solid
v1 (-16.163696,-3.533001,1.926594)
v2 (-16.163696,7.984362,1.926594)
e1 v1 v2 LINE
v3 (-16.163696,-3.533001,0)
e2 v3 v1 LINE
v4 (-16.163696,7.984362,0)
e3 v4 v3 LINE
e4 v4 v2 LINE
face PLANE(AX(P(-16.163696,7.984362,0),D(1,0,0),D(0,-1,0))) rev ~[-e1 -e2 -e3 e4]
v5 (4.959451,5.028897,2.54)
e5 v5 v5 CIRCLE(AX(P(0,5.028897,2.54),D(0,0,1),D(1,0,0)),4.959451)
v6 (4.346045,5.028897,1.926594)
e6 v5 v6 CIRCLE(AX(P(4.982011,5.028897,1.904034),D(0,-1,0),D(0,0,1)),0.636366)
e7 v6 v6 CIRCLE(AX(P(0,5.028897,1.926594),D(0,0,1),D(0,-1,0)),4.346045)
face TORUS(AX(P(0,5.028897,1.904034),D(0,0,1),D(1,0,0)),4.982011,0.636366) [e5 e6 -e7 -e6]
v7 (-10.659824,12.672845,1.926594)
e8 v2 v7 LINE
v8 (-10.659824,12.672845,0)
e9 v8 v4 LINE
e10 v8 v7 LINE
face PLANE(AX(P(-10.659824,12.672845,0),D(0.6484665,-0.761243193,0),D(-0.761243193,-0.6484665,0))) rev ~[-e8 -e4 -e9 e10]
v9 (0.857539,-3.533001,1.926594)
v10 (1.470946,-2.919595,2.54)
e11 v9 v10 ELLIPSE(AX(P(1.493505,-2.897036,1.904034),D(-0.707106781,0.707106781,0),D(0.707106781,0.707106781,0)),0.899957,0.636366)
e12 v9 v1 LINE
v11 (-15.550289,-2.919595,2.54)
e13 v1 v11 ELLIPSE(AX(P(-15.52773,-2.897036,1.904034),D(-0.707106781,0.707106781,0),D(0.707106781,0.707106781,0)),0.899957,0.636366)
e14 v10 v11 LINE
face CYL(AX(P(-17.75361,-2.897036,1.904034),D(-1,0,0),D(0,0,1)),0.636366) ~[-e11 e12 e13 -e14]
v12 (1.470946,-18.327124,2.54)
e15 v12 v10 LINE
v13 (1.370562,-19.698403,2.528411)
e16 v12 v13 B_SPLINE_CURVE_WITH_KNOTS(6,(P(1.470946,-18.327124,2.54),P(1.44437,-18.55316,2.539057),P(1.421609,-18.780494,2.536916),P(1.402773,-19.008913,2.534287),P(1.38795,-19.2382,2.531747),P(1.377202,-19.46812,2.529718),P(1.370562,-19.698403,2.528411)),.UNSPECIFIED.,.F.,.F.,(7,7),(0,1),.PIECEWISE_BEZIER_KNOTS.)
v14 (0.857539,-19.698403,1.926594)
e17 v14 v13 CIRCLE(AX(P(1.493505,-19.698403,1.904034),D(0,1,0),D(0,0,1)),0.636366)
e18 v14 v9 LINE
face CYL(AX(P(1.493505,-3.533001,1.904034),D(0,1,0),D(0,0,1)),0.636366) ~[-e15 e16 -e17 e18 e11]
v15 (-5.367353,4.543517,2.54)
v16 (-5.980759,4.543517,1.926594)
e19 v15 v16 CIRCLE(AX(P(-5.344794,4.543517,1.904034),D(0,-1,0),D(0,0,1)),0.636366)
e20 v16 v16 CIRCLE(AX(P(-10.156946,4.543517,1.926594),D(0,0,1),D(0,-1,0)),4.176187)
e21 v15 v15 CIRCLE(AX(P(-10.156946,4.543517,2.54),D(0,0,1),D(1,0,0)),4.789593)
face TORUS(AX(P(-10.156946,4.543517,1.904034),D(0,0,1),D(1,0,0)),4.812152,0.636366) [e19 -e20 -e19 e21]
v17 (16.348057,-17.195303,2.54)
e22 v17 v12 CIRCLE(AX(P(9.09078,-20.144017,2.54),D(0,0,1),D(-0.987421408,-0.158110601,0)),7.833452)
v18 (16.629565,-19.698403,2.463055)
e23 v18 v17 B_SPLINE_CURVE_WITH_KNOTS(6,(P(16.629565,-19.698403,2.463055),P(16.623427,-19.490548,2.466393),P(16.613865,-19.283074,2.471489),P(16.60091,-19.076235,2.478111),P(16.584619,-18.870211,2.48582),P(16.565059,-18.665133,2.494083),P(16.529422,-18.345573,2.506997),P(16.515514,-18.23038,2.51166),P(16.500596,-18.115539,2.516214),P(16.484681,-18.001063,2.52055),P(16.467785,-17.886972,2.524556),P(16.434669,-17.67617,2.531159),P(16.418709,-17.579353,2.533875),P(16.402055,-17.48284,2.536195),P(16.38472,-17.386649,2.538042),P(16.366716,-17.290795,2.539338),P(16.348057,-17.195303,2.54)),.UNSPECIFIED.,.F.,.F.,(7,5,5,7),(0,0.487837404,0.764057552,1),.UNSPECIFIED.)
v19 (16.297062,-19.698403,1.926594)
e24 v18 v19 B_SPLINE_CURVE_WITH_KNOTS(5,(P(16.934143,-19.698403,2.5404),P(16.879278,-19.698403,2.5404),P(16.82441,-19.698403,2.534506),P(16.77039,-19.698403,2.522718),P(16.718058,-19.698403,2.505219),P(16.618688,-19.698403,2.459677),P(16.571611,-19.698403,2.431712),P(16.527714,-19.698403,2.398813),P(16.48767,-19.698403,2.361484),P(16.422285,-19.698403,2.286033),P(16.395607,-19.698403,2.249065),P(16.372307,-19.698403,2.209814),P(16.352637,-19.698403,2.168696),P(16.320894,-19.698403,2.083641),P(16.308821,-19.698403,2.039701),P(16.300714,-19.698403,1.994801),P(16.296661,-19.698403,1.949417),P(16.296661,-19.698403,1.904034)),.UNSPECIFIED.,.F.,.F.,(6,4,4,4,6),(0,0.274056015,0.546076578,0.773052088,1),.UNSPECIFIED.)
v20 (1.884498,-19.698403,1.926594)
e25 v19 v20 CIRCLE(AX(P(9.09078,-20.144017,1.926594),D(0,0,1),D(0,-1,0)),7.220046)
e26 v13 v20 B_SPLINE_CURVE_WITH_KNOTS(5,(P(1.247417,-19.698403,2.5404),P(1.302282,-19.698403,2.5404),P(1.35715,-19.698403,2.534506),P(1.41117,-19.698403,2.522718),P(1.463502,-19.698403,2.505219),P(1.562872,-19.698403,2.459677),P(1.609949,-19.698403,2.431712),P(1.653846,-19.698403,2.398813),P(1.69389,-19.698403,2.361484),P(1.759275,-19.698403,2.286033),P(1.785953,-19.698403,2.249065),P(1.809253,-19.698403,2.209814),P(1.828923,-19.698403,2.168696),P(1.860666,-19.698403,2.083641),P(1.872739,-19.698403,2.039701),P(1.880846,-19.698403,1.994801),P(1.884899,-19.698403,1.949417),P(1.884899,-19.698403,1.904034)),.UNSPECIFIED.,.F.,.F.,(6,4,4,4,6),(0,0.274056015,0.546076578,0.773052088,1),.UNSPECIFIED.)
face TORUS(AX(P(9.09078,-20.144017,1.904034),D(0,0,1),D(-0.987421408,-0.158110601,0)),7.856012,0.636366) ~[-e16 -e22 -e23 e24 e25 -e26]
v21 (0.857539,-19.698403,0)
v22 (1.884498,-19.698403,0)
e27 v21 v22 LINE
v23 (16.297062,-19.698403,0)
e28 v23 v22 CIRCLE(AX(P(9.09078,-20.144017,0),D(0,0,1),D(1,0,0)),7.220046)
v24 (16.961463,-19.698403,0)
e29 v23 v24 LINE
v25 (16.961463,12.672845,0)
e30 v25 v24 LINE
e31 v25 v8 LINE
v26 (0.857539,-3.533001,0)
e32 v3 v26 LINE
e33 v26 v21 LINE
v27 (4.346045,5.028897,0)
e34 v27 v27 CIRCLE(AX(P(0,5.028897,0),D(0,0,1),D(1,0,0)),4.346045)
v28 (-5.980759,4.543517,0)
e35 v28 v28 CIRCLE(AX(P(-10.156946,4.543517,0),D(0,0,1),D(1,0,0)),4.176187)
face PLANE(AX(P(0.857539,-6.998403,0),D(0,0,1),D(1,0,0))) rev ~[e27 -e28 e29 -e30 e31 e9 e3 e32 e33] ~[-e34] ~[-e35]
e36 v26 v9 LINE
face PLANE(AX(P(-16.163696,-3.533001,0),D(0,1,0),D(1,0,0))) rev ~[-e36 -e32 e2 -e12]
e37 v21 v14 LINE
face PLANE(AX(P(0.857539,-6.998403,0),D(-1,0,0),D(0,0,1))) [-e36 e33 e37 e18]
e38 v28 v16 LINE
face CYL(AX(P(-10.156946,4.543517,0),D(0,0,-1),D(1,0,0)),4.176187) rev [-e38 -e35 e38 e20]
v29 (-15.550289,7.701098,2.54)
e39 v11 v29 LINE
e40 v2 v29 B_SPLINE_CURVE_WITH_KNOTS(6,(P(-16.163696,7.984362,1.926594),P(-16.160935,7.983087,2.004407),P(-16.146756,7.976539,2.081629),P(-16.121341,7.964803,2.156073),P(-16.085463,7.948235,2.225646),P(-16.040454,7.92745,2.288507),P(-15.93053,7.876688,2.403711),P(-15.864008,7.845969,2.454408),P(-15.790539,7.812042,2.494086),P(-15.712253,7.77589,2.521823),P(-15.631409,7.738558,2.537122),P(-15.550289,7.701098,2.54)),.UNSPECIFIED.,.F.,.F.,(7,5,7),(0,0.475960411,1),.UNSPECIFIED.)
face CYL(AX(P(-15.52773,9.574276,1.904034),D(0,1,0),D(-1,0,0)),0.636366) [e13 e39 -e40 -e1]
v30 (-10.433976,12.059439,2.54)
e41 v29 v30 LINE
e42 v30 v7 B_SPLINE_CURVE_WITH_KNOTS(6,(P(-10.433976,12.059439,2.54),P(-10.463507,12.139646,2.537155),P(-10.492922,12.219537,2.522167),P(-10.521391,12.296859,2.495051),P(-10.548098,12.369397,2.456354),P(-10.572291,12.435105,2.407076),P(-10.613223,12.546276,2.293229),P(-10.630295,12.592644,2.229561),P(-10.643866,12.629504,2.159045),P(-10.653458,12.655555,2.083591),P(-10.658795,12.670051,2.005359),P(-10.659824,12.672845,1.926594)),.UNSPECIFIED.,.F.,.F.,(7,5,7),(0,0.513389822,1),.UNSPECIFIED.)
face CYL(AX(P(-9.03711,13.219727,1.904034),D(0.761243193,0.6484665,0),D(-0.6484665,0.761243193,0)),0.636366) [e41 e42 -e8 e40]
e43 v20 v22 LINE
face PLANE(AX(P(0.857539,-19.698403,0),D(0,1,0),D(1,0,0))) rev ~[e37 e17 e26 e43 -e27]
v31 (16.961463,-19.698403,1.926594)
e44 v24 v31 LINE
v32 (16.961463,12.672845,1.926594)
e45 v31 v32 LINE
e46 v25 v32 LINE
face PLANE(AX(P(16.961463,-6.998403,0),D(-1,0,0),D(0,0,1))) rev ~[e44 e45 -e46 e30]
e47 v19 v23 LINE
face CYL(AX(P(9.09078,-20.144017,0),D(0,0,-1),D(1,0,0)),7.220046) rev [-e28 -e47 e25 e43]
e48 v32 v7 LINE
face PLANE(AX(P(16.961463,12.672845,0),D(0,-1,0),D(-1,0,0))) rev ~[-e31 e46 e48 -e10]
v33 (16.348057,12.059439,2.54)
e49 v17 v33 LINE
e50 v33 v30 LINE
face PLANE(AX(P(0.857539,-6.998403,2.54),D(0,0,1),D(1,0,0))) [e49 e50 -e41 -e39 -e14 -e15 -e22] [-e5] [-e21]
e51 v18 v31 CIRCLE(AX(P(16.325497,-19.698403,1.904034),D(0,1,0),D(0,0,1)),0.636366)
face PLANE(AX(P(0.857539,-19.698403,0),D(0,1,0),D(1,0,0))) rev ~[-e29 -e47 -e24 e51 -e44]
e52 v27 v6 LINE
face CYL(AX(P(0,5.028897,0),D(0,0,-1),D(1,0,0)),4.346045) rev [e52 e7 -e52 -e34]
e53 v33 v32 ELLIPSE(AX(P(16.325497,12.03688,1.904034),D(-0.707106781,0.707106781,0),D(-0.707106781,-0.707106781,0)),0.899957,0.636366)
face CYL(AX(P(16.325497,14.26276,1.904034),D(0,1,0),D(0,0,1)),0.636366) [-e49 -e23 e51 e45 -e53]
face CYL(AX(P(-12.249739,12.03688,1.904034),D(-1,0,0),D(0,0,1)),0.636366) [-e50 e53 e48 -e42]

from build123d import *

# Parameters (mm, degrees)
F0_R         = 4.1761867796
F0_R_2       = 4.3460448691
F1_DEPTH     = 2.54
F2_DEPTH     = 12.7
F3_R         = 7.2200461369
F4_DEPTH     = 12.7
F7_T1_DEPTH  = 14.697191958
F7_T3_DEPTH  = 10.4099383433
F7_T5_DEPTH  = 30.8011159773
F7_T7_DEPTH  = 35.5510768625
F7_T9_DEPTH  = 17.7553157696
F7_T11_DEPTH = 18.6111496066
F7_T14_ANGLE = 198.1944914786
F7_T23_DEPTH = 17.7553157696
F7_T27_DEPTH = 18.6111496066


# Not quite as in the source:
# - a fillet or chamfer that OpenCascade refuses, or shapes differently, is made with other operations: its cross-section is extruded or revolved along the edge and cut away or added


with BuildPart() as f1:
    # F0 (on Top) → F1 (new body)
    with BuildSketch(Plane.XY):
        Polygon((-16.1636956036, 7.9843616113), (-16.1636956036, 0), (-16.1636956036, -3.5330012906), (0.857539475, -3.5330012906), (0.857539475, -6.9984025322), (16.9614627957, -6.9984025322), (16.9614627957, 0), (16.9614627957, 12.6728452742), (-10.6598241255, 12.6728452742), align=None)
        with Locations((-10.1569462568, 4.5435167849)):
            Circle(F0_R, mode=Mode.SUBTRACT)
        with Locations((0, 5.0288974307)):
            Circle(F0_R_2, mode=Mode.SUBTRACT)
    extrude(amount=F1_DEPTH)

    # F2 (add): a face of the model
    f2_faces = [f1.faces().sort_by_distance(p)[0] for p in [
        (8.9095011353, -6.9984025322, 1.27),
    ]]
    extrude(f2_faces, amount=F2_DEPTH)


with BuildPart() as f4:
    # F3 (on Top) → F4 (new body)
    with BuildSketch(Plane.XY):
        with Locations((6.5507800318, -27.7640167624)):
            Circle(F3_R)
    extrude(amount=F4_DEPTH)


with BuildPart() as f4_1:
    # F5: moved
    add(f4.part.moved(Location((2.54, 7.62, 0))))


with BuildPart() as f1_1:
    add(f1.part)

    # F6: cut F4
    add(f4_1.part, mode=Mode.SUBTRACT)

    # F7: fillet of radius 0.635 on 11 edges, made by hand

    # F7_s2 → F7_t1 (cut)
    with BuildSketch(Plane.XZ.offset(-9.5742761394)):
        with BuildLine():
            ThreePointArc((-16.1640956036, 1.9040343146), (-15.9777084097, 2.3540128061), (-15.5277299182, 2.5404))
            Line((-15.5277299182, 2.5404), (-15.5277299182, 2.6040365685))
            ThreePointArc((-15.5277299182, 2.6040365685), (-15.8457127609, 2.6036365685), (-16.1636956036, 2.6036365685))
            Line((-16.1636956036, 2.6036365685), (-16.2273321722, 2.54))
            ThreePointArc((-16.2273321722, 2.54), (-16.2273321722, 2.2220171573), (-16.2277321722, 1.9040343146))
            Line((-16.2277321722, 1.9040343146), (-16.1640956036, 1.9040343146))
        make_face()
    extrude(amount=F7_T1_DEPTH, mode=Mode.SUBTRACT)

    # F7_s4 → F7_t3 (cut)
    with BuildSketch(Plane(origin=(1.2888696755, 1.0979261491, 0), x_dir=(0, 0, 1), z_dir=(-0.7612431928, -0.6484664998, 0))):
        with BuildLine():
            ThreePointArc((1.9040343146, 16.560056038), (2.3540128061, 16.373668844), (2.5404, 15.9236903525))
            Line((2.5404, 15.9236903525), (2.6040365685, 15.9236903525))
            ThreePointArc((2.6040365685, 15.9236903525), (2.6036365685, 16.2416731952), (2.6036365685, 16.559656038))
            Line((2.6036365685, 16.559656038), (2.54, 16.6232926065))
            ThreePointArc((2.54, 16.6232926065), (2.2220171573, 16.6232926065), (1.9040343146, 16.6236926065))
            Line((1.9040343146, 16.6236926065), (1.9040343146, 16.560056038))
        make_face()
    extrude(amount=F7_T3_DEPTH, mode=Mode.SUBTRACT)

    # F7_s6 → F7_t5 (cut)
    with BuildSketch(Plane.YZ.offset(-12.2497386535)):
        with BuildLine():
            ThreePointArc((12.0368795888, 2.5404), (12.4868580803, 2.3540128061), (12.6732452742, 1.9040343146))
            Line((12.6732452742, 1.9040343146), (12.7368818428, 1.9040343146))
            ThreePointArc((12.7368818428, 1.9040343146), (12.7364818428, 2.2220171573), (12.7364818428, 2.54))
            Line((12.7364818428, 2.54), (12.6728452742, 2.6036365685))
            ThreePointArc((12.6728452742, 2.6036365685), (12.3548624315, 2.6036365685), (12.0368795888, 2.6040365685))
            Line((12.0368795888, 2.6040365685), (12.0368795888, 2.5404))
        make_face()
    extrude(amount=F7_T5_DEPTH, mode=Mode.SUBTRACT)

    # F7_s8 → F7_t7 (cut)
    with BuildSketch(Plane.XZ.offset(-14.2627598023)):
        with BuildLine():
            ThreePointArc((16.3254971103, 2.5404), (16.7754756018, 2.3540128061), (16.9618627957, 1.9040343146))
            Line((16.9618627957, 1.9040343146), (17.0254993643, 1.9040343146))
            ThreePointArc((17.0254993643, 1.9040343146), (17.0250993643, 2.2220171573), (17.0250993643, 2.54))
            Line((17.0250993643, 2.54), (16.9614627957, 2.6036365685))
            ThreePointArc((16.9614627957, 2.6036365685), (16.643479953, 2.6036365685), (16.3254971103, 2.6040365685))
            Line((16.3254971103, 2.6040365685), (16.3254971103, 2.5404))
        make_face()
    extrude(amount=F7_T7_DEPTH, mode=Mode.SUBTRACT)

    # F7_s10 → F7_t9 (cut)
    with BuildSketch(Plane.XZ.offset(3.5330012906)):
        with BuildLine():
            ThreePointArc((1.4935051604, 2.5404), (1.0435266689, 2.3540128061), (0.857139475, 1.9040343146))
            Line((0.857139475, 1.9040343146), (0.7935029064, 1.9040343146))
            ThreePointArc((0.7935029064, 1.9040343146), (0.7939029064, 2.2220171573), (0.7939029064, 2.54))
            Line((0.7939029064, 2.54), (0.857539475, 2.6036365685))
            ThreePointArc((0.857539475, 2.6036365685), (1.1755223177, 2.6036365685), (1.4935051604, 2.6040365685))
            Line((1.4935051604, 2.6040365685), (1.4935051604, 2.5404))
        make_face()
    extrude(amount=F7_T9_DEPTH, mode=Mode.SUBTRACT)

    # F7_s12 → F7_t11 (cut)
    with BuildSketch(Plane.YZ.offset(-17.7536101317)):
        with BuildLine():
            ThreePointArc((-2.8970356052, 2.5404), (-3.3470140967, 2.3540128061), (-3.5334012906, 1.9040343146))
            Line((-3.5334012906, 1.9040343146), (-3.5970378592, 1.9040343146))
            ThreePointArc((-3.5970378592, 1.9040343146), (-3.5966378592, 2.2220171573), (-3.5966378592, 2.54))
            Line((-3.5966378592, 2.54), (-3.5330012906, 2.6036365685))
            ThreePointArc((-3.5330012906, 2.6036365685), (-3.2150184479, 2.6036365685), (-2.8970356052, 2.6040365685))
            Line((-2.8970356052, 2.6040365685), (-2.8970356052, 2.5404))
        make_face()
    extrude(amount=F7_T11_DEPTH, mode=Mode.SUBTRACT)

    # F7_s13 → F7_t14 (revolve, cut)
    with BuildSketch(Plane(origin=(3.3721800717, -21.0597061225, 0), x_dir=(0, 0, 1), z_dir=(0.1581106012, -0.9874214084, 0))):
        with BuildLine():
            ThreePointArc((2.5404, 2.0645636003), (2.3540128061, 1.6145851088), (1.9040343146, 1.4281979149))
            Line((1.9040343146, 1.4281979149), (1.9040343146, 1.3645613463))
            ThreePointArc((1.9040343146, 1.3645613463), (2.2220171573, 1.3649613463), (2.54, 1.3649613463))
            Line((2.54, 1.3649613463), (2.6036365685, 1.4285979149))
            ThreePointArc((2.6036365685, 1.4285979149), (2.6036365685, 1.7465807576), (2.6040365685, 2.0645636003))
            Line((2.6040365685, 2.0645636003), (2.5404, 2.0645636003))
        make_face()
    revolve(axis=Axis((9.0907800318, -20.1440167624, 2.54), (0, 0, -1)), revolution_arc=F7_T14_ANGLE, mode=Mode.SUBTRACT)

    # F7_s15 → F7_t16 (revolve, cut)
    with BuildSketch(Plane.XZ.offset(-4.5435167849)):
        with BuildLine():
            ThreePointArc((-5.3447937917, 2.5404), (-5.7947722832, 2.3540128061), (-5.9811594771, 1.9040343146))
            Line((-5.9811594771, 1.9040343146), (-6.0447960457, 1.9040343146))
            ThreePointArc((-6.0447960457, 1.9040343146), (-6.0443960457, 2.2220171573), (-6.0443960457, 2.54))
            Line((-6.0443960457, 2.54), (-5.9807594771, 2.6036365685))
            ThreePointArc((-5.9807594771, 2.6036365685), (-5.6627766344, 2.6036365685), (-5.3447937917, 2.6040365685))
            Line((-5.3447937917, 2.6040365685), (-5.3447937917, 2.5404))
        make_face()
    revolve(axis=Axis((-10.1569462568, 4.5435167849, 2.54), (0, 0, 1)), mode=Mode.SUBTRACT)

    # F7_s17 → F7_t18 (revolve, cut)
    with BuildSketch(Plane.XZ.offset(-5.0288974307)):
        with BuildLine():
            ThreePointArc((4.9820105545, 2.5404), (4.532032063, 2.3540128061), (4.3456448691, 1.9040343146))
            Line((4.3456448691, 1.9040343146), (4.2820083005, 1.9040343146))
            ThreePointArc((4.2820083005, 1.9040343146), (4.2824083005, 2.2220171573), (4.2824083005, 2.54))
            Line((4.2824083005, 2.54), (4.3460448691, 2.6036365685))
            ThreePointArc((4.3460448691, 2.6036365685), (4.6640277118, 2.6036365685), (4.9820105545, 2.6040365685))
            Line((4.9820105545, 2.6040365685), (4.9820105545, 2.5404))
        make_face()
    revolve(axis=Axis((0, 5.0288974307, 2.54), (0, 0, 1)), mode=Mode.SUBTRACT)


with BuildPart() as f7_tool21:
    # F7_s22 → F7_t23 (new body)
    with BuildSketch(Plane.XZ.offset(1.9430867626)):
        with BuildLine():
            ThreePointArc((1.4935051604, 2.5404), (1.0435266689, 2.3540128061), (0.857139475, 1.9040343146))
            Line((0.857139475, 1.9040343146), (0.7935029064, 1.9040343146))
            ThreePointArc((0.7935029064, 1.9040343146), (0.7939029064, 2.2220171573), (0.7939029064, 2.54))
            Line((0.7939029064, 2.54), (0.857539475, 2.6036365685))
            ThreePointArc((0.857539475, 2.6036365685), (1.1755223177, 2.6036365685), (1.4935051604, 2.6040365685))
            Line((1.4935051604, 2.6040365685), (1.4935051604, 2.5404))
        make_face()
    extrude(amount=F7_T23_DEPTH)

    split(bisect_by=Plane.XZ.offset(3.5330012906), keep=Keep.BOTTOM)


with BuildPart() as f7_tool25:
    # F7_s26 → F7_t27 (new body)
    with BuildSketch(Plane.YZ.offset(-16.1636956036)):
        with BuildLine():
            ThreePointArc((-2.8970356052, 2.5404), (-3.3470140967, 2.3540128061), (-3.5334012906, 1.9040343146))
            Line((-3.5334012906, 1.9040343146), (-3.5970378592, 1.9040343146))
            ThreePointArc((-3.5970378592, 1.9040343146), (-3.5966378592, 2.2220171573), (-3.5966378592, 2.54))
            Line((-3.5966378592, 2.54), (-3.5330012906, 2.6036365685))
            ThreePointArc((-3.5330012906, 2.6036365685), (-3.2150184479, 2.6036365685), (-2.8970356052, 2.6040365685))
            Line((-2.8970356052, 2.6040365685), (-2.8970356052, 2.5404))
        make_face()
    extrude(amount=F7_T27_DEPTH)

    split(bisect_by=Plane.YZ.offset(0.857539475), keep=Keep.TOP)


with BuildPart() as f7_tool21_1:
    add(f7_tool21.part)

    # F7_t29: intersect F7_tool25
    add(f7_tool25.part, mode=Mode.INTERSECT)


with BuildPart() as f1_2:
    add(f1_1.part)

    # F7_t19: cut F7_tool21
    add(f7_tool21_1.part, mode=Mode.SUBTRACT)


solid = f1_2.part
